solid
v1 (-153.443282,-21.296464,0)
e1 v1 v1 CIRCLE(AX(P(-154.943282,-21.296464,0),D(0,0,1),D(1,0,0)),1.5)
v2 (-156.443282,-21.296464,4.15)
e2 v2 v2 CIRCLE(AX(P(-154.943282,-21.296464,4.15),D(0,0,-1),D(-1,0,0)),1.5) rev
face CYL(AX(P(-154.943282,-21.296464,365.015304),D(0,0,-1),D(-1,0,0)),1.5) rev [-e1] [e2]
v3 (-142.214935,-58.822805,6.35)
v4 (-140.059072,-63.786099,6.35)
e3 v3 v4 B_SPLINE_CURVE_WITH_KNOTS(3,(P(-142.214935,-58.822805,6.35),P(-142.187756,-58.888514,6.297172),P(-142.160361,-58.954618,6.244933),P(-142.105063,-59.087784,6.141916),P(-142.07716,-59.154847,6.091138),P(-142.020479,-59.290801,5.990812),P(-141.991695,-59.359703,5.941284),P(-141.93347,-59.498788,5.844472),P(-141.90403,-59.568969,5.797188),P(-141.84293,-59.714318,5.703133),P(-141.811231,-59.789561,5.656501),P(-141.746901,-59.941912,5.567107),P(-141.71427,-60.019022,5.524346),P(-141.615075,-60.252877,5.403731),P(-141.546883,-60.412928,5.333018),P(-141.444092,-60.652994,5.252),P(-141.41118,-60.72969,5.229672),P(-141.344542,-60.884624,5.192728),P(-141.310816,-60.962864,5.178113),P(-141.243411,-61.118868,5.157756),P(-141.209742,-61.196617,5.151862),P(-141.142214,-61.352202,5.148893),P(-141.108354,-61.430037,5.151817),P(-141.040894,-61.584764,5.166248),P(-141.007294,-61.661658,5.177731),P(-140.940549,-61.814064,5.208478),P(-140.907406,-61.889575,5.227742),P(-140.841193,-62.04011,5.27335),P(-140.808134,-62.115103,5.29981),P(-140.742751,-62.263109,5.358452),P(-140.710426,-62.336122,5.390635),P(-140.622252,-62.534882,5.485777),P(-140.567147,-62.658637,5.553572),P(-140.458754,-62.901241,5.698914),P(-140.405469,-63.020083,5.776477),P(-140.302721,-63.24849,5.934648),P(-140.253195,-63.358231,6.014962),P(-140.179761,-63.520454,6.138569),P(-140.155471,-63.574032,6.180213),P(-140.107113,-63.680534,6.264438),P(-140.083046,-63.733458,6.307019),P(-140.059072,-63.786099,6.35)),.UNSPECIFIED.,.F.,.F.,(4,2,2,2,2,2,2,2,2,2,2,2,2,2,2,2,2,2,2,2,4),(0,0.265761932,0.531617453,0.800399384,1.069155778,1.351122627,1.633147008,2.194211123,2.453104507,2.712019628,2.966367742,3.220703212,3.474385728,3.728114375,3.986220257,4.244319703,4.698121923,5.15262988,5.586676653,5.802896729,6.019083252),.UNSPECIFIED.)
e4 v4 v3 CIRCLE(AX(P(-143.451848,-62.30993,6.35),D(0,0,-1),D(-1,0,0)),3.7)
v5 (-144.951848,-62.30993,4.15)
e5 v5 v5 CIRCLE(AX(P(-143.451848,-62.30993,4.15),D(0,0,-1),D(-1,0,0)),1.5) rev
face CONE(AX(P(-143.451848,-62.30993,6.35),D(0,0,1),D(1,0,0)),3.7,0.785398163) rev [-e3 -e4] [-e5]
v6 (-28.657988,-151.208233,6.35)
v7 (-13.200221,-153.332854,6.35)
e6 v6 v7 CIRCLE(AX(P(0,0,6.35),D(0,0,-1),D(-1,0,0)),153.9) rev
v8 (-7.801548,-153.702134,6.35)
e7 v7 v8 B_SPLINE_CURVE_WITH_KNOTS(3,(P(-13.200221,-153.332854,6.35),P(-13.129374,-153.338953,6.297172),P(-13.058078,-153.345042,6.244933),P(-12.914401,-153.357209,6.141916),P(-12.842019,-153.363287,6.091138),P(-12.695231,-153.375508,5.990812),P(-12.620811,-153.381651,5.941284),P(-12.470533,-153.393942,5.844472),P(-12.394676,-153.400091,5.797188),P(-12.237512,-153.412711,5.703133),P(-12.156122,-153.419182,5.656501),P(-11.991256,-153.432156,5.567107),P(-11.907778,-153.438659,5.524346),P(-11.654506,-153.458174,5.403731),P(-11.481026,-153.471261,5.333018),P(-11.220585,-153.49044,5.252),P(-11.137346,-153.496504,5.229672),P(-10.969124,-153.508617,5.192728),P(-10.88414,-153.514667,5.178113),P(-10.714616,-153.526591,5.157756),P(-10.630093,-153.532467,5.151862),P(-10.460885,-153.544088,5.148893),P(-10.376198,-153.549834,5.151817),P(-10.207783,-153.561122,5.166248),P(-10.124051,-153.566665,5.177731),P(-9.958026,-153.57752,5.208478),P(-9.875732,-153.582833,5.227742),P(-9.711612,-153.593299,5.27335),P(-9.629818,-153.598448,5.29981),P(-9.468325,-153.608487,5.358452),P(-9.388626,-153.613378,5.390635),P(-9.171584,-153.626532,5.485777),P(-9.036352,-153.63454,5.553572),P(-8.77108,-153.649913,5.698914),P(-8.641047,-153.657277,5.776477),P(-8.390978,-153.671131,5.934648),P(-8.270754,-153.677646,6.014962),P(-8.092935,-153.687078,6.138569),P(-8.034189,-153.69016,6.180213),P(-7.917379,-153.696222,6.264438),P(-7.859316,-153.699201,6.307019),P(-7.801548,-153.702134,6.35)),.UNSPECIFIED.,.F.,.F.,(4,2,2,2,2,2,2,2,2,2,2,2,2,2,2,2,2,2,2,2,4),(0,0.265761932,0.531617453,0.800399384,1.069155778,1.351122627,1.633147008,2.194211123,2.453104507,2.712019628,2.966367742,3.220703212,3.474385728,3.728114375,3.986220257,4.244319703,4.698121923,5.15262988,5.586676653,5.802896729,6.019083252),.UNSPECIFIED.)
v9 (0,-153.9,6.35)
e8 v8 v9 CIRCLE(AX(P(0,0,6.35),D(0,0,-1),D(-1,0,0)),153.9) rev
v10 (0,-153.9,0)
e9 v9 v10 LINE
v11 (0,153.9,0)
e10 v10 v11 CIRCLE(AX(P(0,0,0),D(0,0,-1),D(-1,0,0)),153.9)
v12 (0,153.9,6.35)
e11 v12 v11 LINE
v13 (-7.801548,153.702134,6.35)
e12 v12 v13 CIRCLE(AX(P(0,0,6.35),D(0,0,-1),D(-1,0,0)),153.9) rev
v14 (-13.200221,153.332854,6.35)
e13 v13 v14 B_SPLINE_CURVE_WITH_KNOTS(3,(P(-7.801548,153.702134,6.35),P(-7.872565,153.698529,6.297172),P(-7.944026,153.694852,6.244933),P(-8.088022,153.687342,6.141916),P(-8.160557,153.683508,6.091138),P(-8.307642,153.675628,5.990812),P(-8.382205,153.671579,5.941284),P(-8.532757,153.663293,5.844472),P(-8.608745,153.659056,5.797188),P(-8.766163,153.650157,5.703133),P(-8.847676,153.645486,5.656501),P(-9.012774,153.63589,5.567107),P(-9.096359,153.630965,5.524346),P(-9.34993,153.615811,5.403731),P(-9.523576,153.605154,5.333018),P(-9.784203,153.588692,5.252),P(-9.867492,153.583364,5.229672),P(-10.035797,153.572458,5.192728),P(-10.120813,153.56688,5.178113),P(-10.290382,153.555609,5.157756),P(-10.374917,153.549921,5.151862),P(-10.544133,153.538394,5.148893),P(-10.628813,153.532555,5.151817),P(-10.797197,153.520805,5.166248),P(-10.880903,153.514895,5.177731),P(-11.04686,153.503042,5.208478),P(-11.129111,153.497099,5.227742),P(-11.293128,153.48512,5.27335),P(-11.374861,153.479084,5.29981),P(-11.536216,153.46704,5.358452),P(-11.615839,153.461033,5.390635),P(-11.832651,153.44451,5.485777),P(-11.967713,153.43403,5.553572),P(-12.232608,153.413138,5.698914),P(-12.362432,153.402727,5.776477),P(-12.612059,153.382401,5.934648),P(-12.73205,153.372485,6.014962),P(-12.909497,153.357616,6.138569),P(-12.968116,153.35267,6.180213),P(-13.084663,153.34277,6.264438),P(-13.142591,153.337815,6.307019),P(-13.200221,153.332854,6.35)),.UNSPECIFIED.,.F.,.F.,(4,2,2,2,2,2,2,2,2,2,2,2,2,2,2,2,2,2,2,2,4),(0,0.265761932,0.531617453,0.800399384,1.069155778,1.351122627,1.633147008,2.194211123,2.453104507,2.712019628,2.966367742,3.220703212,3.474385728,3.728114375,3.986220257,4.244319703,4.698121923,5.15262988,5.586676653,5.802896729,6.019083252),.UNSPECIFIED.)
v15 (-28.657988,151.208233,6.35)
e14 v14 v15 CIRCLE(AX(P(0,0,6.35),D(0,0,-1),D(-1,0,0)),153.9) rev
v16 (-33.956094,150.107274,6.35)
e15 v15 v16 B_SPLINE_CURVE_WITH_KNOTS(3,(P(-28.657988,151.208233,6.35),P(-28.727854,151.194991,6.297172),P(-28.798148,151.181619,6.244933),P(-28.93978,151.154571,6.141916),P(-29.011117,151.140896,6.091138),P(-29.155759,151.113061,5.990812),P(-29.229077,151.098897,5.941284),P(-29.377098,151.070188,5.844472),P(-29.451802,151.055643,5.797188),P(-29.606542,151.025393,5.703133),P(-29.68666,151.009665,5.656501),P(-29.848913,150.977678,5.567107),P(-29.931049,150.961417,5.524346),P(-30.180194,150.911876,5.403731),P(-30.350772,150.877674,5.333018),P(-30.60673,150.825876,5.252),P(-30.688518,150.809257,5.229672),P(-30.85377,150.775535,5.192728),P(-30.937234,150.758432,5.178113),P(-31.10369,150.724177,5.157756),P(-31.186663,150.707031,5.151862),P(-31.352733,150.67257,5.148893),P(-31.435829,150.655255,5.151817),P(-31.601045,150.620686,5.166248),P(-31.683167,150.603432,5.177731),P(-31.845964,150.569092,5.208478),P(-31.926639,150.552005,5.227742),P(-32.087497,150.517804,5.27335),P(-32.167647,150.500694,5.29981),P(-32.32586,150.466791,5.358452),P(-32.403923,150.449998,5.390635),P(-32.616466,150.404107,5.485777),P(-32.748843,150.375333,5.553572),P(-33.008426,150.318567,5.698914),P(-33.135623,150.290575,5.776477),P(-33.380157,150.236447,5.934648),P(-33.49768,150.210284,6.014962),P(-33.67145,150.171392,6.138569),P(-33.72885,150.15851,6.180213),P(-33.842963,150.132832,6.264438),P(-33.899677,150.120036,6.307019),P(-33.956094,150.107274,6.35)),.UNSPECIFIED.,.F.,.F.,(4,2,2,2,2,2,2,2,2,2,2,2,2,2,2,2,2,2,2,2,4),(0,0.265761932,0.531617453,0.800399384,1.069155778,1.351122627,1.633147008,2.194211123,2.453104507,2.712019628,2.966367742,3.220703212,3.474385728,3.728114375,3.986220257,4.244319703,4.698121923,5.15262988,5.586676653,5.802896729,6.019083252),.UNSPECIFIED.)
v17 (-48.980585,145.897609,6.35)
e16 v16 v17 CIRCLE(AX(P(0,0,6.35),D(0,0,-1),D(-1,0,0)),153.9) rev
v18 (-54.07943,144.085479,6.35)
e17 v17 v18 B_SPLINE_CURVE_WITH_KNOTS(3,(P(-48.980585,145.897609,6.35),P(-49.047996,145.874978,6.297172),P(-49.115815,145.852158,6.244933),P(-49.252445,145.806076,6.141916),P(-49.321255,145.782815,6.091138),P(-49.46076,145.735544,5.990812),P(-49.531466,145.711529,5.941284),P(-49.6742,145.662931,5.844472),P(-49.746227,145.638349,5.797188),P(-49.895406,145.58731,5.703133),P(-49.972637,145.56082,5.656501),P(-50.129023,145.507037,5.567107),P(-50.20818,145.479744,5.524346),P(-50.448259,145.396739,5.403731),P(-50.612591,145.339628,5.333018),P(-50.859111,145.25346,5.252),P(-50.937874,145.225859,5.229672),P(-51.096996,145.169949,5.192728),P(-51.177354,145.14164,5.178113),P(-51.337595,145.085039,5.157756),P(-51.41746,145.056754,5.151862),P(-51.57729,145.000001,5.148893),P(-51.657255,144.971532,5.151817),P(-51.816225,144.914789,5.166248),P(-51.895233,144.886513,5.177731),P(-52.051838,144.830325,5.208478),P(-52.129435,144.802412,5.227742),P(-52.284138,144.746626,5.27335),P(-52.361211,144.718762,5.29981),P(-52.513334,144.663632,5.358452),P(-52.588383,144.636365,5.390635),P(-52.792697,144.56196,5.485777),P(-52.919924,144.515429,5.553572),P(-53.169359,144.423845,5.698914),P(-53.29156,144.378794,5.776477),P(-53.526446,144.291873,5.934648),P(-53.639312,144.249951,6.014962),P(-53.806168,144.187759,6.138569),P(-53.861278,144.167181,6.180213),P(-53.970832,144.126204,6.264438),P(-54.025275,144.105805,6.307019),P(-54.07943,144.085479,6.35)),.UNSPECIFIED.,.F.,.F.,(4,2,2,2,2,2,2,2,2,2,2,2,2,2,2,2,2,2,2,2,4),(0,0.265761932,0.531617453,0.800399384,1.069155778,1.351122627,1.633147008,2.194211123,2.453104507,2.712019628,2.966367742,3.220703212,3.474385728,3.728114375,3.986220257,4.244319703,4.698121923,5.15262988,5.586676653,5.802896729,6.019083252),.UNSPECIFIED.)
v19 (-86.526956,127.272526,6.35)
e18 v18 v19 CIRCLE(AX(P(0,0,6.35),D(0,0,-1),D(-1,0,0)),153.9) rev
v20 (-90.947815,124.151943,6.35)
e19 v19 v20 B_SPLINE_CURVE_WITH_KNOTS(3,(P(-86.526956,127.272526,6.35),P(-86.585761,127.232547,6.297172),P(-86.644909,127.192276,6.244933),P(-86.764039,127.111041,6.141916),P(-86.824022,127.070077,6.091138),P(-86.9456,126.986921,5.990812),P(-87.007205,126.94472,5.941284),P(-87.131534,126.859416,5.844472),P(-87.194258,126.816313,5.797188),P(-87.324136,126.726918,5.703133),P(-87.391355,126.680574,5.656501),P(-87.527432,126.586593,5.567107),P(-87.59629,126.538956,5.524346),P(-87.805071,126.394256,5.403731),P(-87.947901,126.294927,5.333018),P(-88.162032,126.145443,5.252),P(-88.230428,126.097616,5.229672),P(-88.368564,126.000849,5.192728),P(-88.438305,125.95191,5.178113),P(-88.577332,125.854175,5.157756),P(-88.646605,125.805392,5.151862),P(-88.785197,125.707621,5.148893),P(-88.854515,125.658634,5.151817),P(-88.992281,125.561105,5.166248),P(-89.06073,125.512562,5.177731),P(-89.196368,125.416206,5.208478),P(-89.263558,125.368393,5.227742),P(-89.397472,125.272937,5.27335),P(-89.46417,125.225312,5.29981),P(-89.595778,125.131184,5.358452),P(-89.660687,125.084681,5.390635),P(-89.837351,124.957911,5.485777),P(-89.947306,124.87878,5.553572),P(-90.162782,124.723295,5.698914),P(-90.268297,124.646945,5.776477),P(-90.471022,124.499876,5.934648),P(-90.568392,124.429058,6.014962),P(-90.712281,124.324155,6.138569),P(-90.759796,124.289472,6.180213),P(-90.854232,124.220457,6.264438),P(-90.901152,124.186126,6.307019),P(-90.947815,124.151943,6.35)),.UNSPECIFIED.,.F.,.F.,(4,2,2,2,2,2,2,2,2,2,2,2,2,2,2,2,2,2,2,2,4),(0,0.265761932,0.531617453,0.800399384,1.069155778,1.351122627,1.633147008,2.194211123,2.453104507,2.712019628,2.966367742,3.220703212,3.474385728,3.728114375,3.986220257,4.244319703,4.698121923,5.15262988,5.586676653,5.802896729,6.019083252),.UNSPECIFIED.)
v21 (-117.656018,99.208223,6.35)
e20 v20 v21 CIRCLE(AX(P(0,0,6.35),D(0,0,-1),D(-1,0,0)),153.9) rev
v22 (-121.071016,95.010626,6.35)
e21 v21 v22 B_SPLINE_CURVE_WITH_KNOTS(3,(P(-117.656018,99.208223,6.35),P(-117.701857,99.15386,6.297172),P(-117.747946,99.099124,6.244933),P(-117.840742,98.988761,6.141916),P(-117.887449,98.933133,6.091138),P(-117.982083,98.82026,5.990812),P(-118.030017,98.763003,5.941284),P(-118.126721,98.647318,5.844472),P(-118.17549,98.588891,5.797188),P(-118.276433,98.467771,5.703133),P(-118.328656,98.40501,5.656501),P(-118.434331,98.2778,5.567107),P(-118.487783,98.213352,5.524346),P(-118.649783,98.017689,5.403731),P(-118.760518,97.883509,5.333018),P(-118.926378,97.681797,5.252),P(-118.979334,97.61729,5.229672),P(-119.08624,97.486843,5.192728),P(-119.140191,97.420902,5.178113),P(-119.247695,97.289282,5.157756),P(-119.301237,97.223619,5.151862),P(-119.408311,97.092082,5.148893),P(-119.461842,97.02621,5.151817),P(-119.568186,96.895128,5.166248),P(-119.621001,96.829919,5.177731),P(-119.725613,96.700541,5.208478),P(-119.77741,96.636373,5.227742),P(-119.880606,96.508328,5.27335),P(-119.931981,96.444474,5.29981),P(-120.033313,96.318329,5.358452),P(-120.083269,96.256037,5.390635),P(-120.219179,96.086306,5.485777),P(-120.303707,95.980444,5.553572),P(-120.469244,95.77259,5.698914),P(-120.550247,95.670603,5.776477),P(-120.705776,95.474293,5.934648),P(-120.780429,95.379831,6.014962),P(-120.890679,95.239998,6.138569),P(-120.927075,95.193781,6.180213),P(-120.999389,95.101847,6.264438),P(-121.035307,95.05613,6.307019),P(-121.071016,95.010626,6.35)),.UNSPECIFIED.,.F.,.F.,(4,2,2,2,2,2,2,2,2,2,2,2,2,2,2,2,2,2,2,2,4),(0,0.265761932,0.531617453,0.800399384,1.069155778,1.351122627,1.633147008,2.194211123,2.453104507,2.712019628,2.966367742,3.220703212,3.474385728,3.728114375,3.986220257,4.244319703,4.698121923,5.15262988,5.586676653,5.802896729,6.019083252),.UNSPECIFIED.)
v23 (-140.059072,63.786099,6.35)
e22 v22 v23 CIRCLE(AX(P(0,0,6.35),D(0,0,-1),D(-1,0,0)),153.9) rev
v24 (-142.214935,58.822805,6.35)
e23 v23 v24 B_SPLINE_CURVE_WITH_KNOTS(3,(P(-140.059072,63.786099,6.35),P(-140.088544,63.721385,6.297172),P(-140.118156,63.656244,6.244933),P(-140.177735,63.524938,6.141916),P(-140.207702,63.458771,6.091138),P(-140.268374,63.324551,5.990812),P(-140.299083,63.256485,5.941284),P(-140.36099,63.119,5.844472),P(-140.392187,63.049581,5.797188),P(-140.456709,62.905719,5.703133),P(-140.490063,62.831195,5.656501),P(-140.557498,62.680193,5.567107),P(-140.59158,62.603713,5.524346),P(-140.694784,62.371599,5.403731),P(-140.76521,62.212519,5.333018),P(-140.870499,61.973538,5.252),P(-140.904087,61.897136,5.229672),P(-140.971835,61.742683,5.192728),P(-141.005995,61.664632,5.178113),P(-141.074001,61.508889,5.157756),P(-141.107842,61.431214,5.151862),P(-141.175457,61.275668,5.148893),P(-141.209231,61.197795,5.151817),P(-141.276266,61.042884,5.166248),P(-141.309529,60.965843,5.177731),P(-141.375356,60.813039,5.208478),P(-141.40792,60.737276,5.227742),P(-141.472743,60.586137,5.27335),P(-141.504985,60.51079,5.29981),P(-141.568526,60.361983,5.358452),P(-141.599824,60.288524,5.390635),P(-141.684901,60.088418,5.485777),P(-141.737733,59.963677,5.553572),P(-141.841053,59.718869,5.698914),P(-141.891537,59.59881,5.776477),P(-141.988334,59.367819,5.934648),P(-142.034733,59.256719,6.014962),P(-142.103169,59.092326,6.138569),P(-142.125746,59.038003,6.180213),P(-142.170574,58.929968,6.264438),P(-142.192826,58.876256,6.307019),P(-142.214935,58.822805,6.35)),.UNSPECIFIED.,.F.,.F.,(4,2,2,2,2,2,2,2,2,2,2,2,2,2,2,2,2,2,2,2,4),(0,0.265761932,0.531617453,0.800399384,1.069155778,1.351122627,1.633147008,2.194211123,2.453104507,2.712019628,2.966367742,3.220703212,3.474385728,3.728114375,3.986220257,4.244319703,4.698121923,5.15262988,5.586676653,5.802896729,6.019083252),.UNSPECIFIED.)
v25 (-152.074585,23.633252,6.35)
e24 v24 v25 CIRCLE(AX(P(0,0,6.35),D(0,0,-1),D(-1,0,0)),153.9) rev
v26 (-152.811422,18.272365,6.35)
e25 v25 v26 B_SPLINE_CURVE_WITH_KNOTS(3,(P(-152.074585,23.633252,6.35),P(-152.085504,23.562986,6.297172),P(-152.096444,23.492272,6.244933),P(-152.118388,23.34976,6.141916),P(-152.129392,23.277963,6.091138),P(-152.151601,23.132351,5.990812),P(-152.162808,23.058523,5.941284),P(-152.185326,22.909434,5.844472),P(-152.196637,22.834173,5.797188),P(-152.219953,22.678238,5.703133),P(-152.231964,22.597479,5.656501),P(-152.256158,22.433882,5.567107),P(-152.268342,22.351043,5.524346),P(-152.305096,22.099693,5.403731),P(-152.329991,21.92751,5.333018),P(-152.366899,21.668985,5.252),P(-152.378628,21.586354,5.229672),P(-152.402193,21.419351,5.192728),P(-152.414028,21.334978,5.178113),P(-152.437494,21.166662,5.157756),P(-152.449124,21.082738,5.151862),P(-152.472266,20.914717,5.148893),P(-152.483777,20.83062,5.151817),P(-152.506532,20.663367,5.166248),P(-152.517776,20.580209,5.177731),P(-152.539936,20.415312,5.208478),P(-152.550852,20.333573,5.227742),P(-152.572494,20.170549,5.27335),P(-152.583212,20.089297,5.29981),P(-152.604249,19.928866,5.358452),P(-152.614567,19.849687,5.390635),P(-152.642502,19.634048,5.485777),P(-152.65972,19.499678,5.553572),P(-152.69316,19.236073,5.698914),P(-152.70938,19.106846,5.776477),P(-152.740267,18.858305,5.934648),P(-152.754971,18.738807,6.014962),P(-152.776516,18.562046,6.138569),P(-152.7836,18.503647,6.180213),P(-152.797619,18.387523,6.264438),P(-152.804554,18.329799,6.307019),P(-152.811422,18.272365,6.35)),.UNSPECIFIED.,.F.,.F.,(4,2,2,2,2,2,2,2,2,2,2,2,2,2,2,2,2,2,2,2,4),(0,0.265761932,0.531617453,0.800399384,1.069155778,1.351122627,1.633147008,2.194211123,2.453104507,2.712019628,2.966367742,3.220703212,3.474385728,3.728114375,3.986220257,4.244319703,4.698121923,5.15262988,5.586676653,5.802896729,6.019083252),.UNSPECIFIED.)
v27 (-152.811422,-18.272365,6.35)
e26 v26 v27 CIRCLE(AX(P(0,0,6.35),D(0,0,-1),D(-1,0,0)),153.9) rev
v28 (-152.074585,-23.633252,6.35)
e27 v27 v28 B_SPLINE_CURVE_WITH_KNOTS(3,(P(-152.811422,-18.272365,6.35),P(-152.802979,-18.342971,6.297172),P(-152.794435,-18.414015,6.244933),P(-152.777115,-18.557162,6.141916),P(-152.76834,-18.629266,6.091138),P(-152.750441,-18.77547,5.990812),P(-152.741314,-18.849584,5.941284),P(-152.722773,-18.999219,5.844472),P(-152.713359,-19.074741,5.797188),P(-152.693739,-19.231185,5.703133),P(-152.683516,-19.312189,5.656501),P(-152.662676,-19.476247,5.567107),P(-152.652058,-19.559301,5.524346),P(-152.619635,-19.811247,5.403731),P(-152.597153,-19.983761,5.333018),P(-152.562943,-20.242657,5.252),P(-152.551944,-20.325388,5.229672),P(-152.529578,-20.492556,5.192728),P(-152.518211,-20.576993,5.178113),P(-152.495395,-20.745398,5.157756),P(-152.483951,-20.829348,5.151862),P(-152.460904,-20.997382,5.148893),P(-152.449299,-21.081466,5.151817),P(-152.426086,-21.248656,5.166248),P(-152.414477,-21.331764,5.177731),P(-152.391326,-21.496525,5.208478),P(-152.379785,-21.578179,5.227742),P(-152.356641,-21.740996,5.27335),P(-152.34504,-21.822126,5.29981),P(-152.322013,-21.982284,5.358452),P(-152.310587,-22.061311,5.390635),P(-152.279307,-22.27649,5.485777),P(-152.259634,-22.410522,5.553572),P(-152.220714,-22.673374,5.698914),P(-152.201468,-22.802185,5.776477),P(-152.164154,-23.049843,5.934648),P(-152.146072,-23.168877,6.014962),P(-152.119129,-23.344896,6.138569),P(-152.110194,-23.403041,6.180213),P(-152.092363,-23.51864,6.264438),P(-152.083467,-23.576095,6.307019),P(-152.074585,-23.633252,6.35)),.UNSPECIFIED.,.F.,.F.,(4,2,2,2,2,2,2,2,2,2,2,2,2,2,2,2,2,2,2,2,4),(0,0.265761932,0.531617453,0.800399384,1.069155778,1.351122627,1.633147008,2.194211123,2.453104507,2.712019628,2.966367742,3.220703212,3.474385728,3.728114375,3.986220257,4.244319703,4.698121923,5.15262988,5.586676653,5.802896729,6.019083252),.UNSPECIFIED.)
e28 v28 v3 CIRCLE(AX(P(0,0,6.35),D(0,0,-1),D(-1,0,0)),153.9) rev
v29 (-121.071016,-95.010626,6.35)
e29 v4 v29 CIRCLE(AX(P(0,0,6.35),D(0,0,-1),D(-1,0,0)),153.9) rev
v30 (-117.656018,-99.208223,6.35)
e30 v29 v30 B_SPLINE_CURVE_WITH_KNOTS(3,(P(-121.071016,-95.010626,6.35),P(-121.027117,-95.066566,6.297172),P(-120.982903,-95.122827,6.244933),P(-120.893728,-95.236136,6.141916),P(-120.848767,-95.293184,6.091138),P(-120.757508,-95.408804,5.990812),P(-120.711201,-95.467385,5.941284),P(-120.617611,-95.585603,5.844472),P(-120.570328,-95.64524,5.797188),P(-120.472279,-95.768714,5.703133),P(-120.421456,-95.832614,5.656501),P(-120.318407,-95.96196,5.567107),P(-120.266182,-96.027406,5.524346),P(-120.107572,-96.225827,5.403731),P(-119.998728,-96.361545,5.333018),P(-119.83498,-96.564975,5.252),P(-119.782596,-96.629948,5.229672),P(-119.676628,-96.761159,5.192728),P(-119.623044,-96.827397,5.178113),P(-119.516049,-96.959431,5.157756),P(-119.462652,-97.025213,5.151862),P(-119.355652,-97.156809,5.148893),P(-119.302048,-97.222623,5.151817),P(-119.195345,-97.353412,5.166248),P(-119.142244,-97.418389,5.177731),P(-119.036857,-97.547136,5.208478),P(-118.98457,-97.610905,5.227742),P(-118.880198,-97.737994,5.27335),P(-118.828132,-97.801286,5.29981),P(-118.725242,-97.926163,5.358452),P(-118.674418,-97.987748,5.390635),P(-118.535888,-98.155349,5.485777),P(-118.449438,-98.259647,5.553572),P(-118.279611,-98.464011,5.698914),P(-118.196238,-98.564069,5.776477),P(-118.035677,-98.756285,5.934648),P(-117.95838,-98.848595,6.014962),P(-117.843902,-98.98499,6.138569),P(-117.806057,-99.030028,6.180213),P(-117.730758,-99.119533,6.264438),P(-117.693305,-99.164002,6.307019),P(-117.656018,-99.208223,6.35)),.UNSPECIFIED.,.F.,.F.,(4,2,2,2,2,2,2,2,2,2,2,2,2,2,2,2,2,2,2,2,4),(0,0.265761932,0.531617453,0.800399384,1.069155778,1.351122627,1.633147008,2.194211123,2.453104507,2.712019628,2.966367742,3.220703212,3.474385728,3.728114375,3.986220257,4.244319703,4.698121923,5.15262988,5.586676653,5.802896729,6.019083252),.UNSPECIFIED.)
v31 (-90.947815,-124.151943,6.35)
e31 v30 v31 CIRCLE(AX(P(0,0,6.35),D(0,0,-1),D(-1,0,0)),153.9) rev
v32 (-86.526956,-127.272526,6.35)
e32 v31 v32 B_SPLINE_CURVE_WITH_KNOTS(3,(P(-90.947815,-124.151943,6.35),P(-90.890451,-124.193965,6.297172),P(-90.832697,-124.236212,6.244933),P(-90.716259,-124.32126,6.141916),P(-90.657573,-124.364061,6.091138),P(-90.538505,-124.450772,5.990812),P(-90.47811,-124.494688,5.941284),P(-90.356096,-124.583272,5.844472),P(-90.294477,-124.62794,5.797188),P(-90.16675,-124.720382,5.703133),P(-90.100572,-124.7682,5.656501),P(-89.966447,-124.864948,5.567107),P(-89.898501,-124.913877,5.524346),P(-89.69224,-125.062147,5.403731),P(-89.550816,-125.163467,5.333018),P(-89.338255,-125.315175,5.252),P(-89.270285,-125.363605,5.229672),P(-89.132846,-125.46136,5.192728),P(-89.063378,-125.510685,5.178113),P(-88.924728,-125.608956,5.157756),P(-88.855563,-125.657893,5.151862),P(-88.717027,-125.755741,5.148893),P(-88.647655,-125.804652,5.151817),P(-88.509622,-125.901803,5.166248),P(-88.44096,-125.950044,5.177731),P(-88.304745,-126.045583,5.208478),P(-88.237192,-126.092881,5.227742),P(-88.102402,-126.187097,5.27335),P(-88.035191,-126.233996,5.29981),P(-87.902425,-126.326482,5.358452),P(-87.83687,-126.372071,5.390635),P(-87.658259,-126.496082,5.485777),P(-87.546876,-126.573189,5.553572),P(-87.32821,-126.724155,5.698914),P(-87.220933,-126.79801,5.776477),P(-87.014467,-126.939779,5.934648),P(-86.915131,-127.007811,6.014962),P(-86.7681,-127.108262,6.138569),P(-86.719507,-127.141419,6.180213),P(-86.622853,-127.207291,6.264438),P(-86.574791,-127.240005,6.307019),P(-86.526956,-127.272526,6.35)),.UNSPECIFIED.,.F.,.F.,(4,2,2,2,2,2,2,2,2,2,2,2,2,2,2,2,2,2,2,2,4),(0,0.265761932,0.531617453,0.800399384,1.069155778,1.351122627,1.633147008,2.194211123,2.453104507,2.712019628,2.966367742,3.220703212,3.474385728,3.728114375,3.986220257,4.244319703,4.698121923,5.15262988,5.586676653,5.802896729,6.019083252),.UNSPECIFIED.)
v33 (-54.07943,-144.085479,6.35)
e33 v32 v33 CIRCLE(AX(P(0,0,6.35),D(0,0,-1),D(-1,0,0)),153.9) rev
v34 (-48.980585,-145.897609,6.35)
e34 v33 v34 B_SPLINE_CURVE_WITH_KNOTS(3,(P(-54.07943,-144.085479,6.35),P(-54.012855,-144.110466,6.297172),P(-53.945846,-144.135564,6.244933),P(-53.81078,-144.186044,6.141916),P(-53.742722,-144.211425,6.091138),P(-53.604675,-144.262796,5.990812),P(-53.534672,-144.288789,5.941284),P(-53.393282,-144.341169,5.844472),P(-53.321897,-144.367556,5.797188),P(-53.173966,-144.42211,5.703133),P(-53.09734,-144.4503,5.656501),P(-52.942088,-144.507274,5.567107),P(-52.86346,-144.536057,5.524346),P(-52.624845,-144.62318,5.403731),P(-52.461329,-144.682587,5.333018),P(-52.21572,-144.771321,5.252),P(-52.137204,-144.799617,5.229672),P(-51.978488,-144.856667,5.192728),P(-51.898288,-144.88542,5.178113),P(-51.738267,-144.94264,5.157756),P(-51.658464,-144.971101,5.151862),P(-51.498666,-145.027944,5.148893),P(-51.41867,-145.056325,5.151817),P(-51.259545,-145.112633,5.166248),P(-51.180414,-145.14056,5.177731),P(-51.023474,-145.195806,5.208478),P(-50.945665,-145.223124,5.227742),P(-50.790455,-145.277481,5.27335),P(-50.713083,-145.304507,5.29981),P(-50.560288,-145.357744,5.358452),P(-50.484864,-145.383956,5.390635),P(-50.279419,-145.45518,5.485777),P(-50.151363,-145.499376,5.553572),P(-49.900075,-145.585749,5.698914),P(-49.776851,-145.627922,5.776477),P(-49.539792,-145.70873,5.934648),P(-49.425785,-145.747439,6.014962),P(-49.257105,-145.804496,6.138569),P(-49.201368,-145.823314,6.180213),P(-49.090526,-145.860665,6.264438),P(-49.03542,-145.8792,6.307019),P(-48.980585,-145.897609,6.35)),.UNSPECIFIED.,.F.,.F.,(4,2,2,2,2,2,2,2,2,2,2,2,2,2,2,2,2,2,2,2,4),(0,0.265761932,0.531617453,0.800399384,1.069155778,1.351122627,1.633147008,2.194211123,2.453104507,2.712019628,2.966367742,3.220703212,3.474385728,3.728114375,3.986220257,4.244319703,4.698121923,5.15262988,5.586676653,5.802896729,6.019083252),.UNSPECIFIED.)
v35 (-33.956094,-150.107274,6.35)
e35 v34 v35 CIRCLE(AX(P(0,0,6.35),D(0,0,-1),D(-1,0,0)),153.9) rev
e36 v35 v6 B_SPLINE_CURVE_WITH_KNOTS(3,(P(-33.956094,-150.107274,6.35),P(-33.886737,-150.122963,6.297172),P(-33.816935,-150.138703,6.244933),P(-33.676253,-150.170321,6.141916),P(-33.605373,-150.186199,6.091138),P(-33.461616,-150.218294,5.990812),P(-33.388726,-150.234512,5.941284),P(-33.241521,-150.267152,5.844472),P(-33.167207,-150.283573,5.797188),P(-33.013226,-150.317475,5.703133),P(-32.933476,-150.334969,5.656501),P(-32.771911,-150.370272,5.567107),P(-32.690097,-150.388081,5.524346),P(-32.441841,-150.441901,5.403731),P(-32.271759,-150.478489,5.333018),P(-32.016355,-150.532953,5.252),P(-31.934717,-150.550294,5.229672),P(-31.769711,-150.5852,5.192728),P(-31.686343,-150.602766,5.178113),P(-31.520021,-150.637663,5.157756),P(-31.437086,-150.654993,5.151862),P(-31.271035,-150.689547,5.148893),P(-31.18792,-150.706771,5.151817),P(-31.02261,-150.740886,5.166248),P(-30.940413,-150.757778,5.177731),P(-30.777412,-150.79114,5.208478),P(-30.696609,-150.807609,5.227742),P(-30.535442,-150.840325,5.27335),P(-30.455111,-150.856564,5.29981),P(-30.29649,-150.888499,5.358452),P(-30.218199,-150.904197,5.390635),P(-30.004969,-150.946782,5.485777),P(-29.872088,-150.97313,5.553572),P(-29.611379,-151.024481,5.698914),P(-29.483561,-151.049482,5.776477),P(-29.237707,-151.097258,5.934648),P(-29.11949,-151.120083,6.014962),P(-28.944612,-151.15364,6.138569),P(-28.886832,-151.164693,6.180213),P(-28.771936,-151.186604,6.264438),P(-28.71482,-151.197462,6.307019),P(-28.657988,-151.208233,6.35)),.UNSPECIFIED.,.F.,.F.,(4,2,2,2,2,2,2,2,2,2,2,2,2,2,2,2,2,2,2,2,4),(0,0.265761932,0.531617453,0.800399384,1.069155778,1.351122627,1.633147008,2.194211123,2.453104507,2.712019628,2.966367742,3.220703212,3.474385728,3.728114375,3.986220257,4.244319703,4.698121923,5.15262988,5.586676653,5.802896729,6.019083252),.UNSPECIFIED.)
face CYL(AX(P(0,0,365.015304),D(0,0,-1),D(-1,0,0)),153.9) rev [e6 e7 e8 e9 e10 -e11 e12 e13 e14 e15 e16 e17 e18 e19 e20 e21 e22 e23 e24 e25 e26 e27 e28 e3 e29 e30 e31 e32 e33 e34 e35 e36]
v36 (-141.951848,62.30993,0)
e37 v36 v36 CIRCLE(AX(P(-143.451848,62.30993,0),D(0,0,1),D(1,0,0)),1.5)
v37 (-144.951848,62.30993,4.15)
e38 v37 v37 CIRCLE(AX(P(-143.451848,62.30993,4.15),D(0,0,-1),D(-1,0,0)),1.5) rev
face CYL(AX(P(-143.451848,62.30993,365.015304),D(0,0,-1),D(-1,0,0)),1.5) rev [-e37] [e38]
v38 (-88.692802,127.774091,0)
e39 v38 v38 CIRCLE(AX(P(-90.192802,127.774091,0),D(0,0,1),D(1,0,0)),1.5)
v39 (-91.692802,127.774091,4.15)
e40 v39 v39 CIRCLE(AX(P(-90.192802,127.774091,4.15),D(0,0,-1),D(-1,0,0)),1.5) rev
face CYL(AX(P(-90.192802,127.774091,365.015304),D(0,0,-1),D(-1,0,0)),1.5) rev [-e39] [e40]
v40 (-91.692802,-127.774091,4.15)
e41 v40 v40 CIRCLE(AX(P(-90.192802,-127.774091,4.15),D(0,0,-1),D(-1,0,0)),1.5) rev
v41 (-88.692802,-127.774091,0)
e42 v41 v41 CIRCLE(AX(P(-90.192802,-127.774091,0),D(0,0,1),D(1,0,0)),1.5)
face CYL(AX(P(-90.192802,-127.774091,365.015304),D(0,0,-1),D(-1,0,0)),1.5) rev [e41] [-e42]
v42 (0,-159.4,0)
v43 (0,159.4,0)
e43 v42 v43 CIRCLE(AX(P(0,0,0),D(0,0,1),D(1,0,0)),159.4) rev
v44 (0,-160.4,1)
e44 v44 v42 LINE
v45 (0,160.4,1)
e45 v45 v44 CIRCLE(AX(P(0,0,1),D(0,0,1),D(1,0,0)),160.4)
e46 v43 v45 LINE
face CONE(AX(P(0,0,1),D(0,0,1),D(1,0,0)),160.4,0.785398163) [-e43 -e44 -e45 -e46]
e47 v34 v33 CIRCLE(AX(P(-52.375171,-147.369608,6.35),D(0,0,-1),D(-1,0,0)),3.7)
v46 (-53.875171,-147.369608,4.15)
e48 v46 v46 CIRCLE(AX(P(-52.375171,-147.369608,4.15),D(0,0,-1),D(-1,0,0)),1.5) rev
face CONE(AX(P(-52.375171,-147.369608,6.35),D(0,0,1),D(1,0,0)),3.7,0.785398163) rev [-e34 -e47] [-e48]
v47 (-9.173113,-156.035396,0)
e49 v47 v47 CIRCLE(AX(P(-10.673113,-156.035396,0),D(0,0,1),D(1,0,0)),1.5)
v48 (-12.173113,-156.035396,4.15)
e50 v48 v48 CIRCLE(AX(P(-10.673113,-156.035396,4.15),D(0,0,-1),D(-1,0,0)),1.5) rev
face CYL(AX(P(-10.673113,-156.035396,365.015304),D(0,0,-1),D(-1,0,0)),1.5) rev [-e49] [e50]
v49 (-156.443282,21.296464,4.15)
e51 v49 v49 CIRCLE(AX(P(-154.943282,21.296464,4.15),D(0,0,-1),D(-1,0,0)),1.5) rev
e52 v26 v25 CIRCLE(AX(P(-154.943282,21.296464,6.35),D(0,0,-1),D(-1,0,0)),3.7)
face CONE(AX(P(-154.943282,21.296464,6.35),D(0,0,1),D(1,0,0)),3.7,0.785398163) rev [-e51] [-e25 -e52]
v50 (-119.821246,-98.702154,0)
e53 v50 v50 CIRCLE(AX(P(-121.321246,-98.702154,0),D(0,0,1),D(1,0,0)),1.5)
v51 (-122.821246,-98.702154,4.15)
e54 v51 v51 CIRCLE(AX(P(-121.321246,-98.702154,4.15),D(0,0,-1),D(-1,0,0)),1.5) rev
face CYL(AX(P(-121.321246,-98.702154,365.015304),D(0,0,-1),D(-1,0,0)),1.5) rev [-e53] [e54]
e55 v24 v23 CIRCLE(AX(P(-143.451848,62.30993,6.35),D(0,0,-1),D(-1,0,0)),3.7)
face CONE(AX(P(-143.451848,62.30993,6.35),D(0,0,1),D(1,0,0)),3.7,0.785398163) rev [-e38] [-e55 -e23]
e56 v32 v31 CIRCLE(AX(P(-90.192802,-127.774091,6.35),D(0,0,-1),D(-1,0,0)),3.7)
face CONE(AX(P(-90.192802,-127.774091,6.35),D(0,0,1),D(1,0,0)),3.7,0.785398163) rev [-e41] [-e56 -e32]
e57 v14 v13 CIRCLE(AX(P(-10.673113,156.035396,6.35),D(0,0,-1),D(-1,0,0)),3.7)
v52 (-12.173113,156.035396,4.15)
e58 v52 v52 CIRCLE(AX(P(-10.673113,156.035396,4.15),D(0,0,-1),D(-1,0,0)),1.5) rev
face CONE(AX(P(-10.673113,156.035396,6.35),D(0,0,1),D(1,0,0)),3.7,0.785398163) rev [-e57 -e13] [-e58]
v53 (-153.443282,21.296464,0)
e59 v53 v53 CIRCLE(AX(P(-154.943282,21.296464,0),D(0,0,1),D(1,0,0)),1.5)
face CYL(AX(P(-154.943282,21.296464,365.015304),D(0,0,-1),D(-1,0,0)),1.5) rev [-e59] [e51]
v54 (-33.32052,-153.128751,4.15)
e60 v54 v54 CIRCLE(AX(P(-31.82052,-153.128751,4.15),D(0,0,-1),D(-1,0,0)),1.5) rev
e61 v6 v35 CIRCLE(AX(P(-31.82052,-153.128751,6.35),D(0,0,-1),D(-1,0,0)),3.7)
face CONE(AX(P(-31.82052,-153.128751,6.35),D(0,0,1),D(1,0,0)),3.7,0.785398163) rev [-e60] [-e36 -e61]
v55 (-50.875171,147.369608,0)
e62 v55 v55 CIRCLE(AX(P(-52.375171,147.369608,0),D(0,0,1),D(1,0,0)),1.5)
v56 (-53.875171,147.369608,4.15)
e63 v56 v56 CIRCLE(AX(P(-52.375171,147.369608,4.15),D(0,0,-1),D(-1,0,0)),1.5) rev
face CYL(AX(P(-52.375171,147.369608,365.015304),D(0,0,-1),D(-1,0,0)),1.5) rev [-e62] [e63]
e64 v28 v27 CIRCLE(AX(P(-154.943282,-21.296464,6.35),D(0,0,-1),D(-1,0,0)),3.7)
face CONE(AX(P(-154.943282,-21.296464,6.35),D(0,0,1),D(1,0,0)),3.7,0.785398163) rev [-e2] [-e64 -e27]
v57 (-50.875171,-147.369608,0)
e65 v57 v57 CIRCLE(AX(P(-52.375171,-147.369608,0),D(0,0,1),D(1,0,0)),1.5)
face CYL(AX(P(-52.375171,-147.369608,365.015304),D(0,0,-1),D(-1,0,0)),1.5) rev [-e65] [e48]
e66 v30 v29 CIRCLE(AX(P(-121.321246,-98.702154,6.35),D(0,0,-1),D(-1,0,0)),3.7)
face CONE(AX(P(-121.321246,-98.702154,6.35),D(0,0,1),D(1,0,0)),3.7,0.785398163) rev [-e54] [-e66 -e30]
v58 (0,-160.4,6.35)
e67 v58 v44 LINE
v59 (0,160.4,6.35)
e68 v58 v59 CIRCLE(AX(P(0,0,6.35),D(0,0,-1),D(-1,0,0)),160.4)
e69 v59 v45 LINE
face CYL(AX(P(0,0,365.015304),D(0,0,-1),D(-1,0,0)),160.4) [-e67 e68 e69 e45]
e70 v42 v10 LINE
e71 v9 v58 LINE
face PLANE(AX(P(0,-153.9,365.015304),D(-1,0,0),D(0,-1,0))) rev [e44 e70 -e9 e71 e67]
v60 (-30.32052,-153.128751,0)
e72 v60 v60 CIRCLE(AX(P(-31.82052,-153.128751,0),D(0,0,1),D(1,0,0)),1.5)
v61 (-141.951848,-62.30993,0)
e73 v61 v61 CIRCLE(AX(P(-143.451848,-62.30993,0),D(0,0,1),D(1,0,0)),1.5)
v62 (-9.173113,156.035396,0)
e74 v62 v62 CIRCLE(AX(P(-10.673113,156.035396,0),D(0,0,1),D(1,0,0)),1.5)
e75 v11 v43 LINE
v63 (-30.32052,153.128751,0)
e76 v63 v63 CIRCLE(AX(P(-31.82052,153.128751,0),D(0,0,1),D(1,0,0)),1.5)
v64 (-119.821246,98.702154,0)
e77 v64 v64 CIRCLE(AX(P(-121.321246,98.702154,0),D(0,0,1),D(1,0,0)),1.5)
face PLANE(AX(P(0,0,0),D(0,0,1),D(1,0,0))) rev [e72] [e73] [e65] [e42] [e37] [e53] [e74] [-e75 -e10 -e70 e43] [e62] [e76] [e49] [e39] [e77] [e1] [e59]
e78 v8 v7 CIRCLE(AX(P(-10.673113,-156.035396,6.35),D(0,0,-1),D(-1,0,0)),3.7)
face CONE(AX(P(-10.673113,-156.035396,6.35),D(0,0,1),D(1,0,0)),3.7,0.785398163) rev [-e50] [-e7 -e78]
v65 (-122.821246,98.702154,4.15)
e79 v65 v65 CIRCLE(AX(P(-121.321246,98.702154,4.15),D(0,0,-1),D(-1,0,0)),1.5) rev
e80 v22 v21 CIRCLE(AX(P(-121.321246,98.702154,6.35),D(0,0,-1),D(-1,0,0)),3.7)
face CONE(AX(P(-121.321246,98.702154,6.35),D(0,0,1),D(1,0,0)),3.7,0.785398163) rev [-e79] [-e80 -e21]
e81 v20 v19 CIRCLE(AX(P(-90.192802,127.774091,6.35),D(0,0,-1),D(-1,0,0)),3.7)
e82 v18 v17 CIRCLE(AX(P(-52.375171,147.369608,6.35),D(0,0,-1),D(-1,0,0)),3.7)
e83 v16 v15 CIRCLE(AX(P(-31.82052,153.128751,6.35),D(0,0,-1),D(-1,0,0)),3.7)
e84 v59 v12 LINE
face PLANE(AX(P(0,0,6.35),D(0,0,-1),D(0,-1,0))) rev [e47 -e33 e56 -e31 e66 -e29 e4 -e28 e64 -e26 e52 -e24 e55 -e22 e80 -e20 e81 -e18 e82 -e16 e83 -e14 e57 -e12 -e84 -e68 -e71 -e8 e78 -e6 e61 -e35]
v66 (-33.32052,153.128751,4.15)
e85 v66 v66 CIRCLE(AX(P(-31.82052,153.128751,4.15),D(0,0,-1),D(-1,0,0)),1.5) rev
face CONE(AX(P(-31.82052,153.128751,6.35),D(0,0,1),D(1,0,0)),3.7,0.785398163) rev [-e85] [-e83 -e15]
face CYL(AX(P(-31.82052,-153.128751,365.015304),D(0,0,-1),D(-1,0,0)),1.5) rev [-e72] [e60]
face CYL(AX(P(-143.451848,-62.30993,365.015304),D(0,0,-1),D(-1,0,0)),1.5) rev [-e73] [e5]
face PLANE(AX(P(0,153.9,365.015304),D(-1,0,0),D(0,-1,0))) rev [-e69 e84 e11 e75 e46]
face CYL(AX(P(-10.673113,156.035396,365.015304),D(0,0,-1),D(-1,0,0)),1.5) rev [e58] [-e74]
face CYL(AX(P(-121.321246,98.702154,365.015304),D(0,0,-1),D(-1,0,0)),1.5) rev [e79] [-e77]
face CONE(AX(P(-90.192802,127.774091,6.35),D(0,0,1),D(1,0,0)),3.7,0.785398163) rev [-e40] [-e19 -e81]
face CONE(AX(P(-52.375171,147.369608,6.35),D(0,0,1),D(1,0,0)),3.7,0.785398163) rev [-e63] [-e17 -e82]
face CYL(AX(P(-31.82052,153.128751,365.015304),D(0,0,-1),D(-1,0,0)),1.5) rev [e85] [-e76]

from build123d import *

# Parameters (mm, degrees)
SKETCH1_R           = 1.5
BOSS_EXTRUDE1_DEPTH = 6.35
CHAMFER2_SIZE       = 1


with BuildPart() as part:
    # Sketch1 → Boss-Extrude1 (new body)
    with BuildSketch(Plane.XY):
        with BuildLine():
            Line((0, -153.9), (0, -160.4))
            ThreePointArc((0, -160.4), (-160.4, 0), (0, 160.4))
            Line((0, 160.4), (0, 153.9))
            ThreePointArc((0, 153.9), (-153.9, 0), (0, -153.9))
        make_face()
        with Locations(Location((-10.67311345, 156.035395501, 0), (0, 0, 180))):
            Circle(SKETCH1_R, mode=Mode.SUBTRACT)
        with Locations(Location((-31.820520441, 153.128751314, 0), (0, 0, 180))):
            Circle(SKETCH1_R, mode=Mode.SUBTRACT)
        with Locations(Location((-52.375171344, 147.369608219, 0), (0, 0, 180))):
            Circle(SKETCH1_R, mode=Mode.SUBTRACT)
        with Locations(Location((-154.94328196, 21.296463919, 0), (0, 0, 180))):
            Circle(SKETCH1_R, mode=Mode.SUBTRACT)
        with Locations(Location((-143.451847555, 62.309930452, 0), (0, 0, 180))):
            Circle(SKETCH1_R, mode=Mode.SUBTRACT)
        with Locations(Location((-121.321245866, 98.702154493, 0), (0, 0, 180))):
            Circle(SKETCH1_R, mode=Mode.SUBTRACT)
        with Locations(Location((-90.192802379, 127.774091267, 0), (0, 0, 180))):
            Circle(SKETCH1_R, mode=Mode.SUBTRACT)
        with Locations(Location((-154.94328196, -21.296463919, 0), (0, 0, 180))):
            Circle(SKETCH1_R, mode=Mode.SUBTRACT)
        with Locations(Location((-143.451847555, -62.309930452, 0), (0, 0, 180))):
            Circle(SKETCH1_R, mode=Mode.SUBTRACT)
        with Locations(Location((-121.321245866, -98.702154493, 0), (0, 0, 180))):
            Circle(SKETCH1_R, mode=Mode.SUBTRACT)
        with Locations(Location((-90.192802379, -127.774091267, 0), (0, 0, 180))):
            Circle(SKETCH1_R, mode=Mode.SUBTRACT)
        with Locations(Location((-52.375171344, -147.369608219, 0), (0, 0, 180))):
            Circle(SKETCH1_R, mode=Mode.SUBTRACT)
        with Locations(Location((-10.67311345, -156.035395501, 0), (0, 0, 180))):
            Circle(SKETCH1_R, mode=Mode.SUBTRACT)
        with Locations(Location((-31.820520441, -153.128751314, 0), (0, 0, 180))):
            Circle(SKETCH1_R, mode=Mode.SUBTRACT)
    extrude(amount=BOSS_EXTRUDE1_DEPTH)

    # Chamfer1: read off the stored shape, not the designer's step
    # Chamfer1: loft between two sections, ruled curve by curve
    chamfer1_from = [
        Edge.make_three_point_arc((-9.508965266, -155.089478484, 4.15), (-11.619030468, -154.871247317, 4.15), (-11.837261635, -156.981312519, 4.15)),
        Edge.make_three_point_arc((-11.837261635, -156.981312519, 4.15), (-9.727196432, -157.199543686, 4.15), (-9.508965266, -155.089478484, 4.15)),
    ]
    chamfer1_to = [
        Edge.make_three_point_arc((-7.801547928, -153.702133524, 6.35), (-13.006375427, -153.16382998, 6.35), (-13.544678972, -158.368657479, 6.35)),
        Edge.make_three_point_arc((-13.544678972, -158.368657479, 6.35), (-8.339851473, -158.906961023, 6.35), (-7.801547928, -153.702133524, 6.35)),
    ]
    chamfer1 = Solid(Shell([*[Face.make_surface_from_curves(chamfer1_from[k], chamfer1_to[k]) for k in range(2)], Face(Wire(chamfer1_from)), Face(Wire(chamfer1_to))]))
    add(chamfer1, mode=Mode.SUBTRACT)

    # Chamfer1 2: loft between two sections, ruled curve by curve
    chamfer1_2_from = [
        Edge.make_three_point_arc((-30.538412845, -152.350162775, 4.15), (-32.59910898, -151.846643717, 4.15), (-33.102628038, -153.907339852, 4.15)),
        Edge.make_three_point_arc((-33.102628038, -153.907339852, 4.15), (-31.041931903, -154.41085891, 4.15), (-30.538412845, -152.350162775, 4.15)),
    ]
    chamfer1_2_to = [
        Edge.make_three_point_arc((-28.657988371, -151.208232919, 6.35), (-33.741038836, -149.966219243, 6.35), (-34.983052512, -155.049269708, 6.35)),
        Edge.make_three_point_arc((-34.983052512, -155.049269708, 6.35), (-29.900002047, -156.291283384, 6.35), (-28.657988371, -151.208232919, 6.35)),
    ]
    chamfer1_2 = Solid(Shell([*[Face.make_surface_from_curves(chamfer1_2_from[k], chamfer1_2_to[k]) for k in range(2)], Face(Wire(chamfer1_2_from)), Face(Wire(chamfer1_2_to))]))
    add(chamfer1_2, mode=Mode.SUBTRACT)

    # Chamfer1 3: loft between two sections, ruled curve by curve
    chamfer1_3_from = [
        Edge.make_three_point_arc((-50.998987574, -146.772851792, 4.15), (-52.971927771, -145.99342445, 4.15), (-53.751355113, -147.966364647, 4.15)),
        Edge.make_three_point_arc((-53.751355113, -147.966364647, 4.15), (-51.778414916, -148.745791988, 4.15), (-50.998987574, -146.772851792, 4.15)),
    ]
    chamfer1_3_to = [
        Edge.make_three_point_arc((-48.980584713, -145.897609032, 6.35), (-53.847170531, -143.975021589, 6.35), (-55.769757974, -148.841607407, 6.35)),
        Edge.make_three_point_arc((-55.769757974, -148.841607407, 6.35), (-50.903172156, -150.76419485, 6.35), (-48.980584713, -145.897609032, 6.35)),
    ]
    chamfer1_3 = Solid(Shell([*[Face.make_surface_from_curves(chamfer1_3_from[k], chamfer1_3_to[k]) for k in range(2)], Face(Wire(chamfer1_3_from)), Face(Wire(chamfer1_3_to))]))
    add(chamfer1_3, mode=Mode.SUBTRACT)

    # Chamfer1 4: loft between two sections, ruled curve by curve
    chamfer1_4_from = [
        Edge.make_three_point_arc((-88.70664828, -127.570754124, 4.15), (-90.396139522, -126.287937168, 4.15), (-91.678956478, -127.97742841, 4.15)),
        Edge.make_three_point_arc((-91.678956478, -127.97742841, 4.15), (-89.989465236, -129.260245366, 4.15), (-88.70664828, -127.570754124, 4.15)),
    ]
    chamfer1_4_to = [
        Edge.make_three_point_arc((-86.526955601, -127.272526314, 6.35), (-90.694367331, -124.108244489, 6.35), (-93.858649157, -128.275656219, 6.35)),
        Edge.make_three_point_arc((-93.858649157, -128.275656219, 6.35), (-89.691237426, -131.439938045, 6.35), (-86.526955601, -127.272526314, 6.35)),
    ]
    chamfer1_4 = Solid(Shell([*[Face.make_surface_from_curves(chamfer1_4_from[k], chamfer1_4_to[k]) for k in range(2)], Face(Wire(chamfer1_4_from)), Face(Wire(chamfer1_4_to))]))
    add(chamfer1_4, mode=Mode.SUBTRACT)

    # Chamfer1 5: loft between two sections, ruled curve by curve
    chamfer1_5_from = [
        Edge.make_three_point_arc((-119.835342688, -98.90731722, 4.15), (-121.116083139, -97.216251314, 4.15), (-122.807149044, -98.496991765, 4.15)),
        Edge.make_three_point_arc((-122.807149044, -98.496991765, 4.15), (-121.526408593, -100.188057671, 4.15), (-119.835342688, -98.90731722, 4.15)),
    ]
    chamfer1_5_to = [
        Edge.make_three_point_arc((-117.656018026, -99.208222553, 6.35), (-120.815177805, -95.036926653, 6.35), (-124.986473706, -98.196086432, 6.35)),
        Edge.make_three_point_arc((-124.986473706, -98.196086432, 6.35), (-121.827313927, -102.367382332, 6.35), (-117.656018026, -99.208222553, 6.35)),
    ]
    chamfer1_5 = Solid(Shell([*[Face.make_surface_from_curves(chamfer1_5_from[k], chamfer1_5_to[k]) for k in range(2)], Face(Wire(chamfer1_5_from)), Face(Wire(chamfer1_5_to))]))
    add(chamfer1_5, mode=Mode.SUBTRACT)

    # Chamfer1 6: loft between two sections, ruled curve by curve
    chamfer1_6_from = [
        Edge.make_three_point_arc((-142.076397939, -62.908377069, 4.15), (-142.853400939, -60.934480836, 4.15), (-144.827297172, -61.711483835, 4.15)),
        Edge.make_three_point_arc((-144.827297172, -61.711483835, 4.15), (-144.050294172, -63.685380068, 4.15), (-142.076397939, -62.908377069, 4.15)),
    ]
    chamfer1_6_to = [
        Edge.make_three_point_arc((-140.059071835, -63.786098773, 6.35), (-141.975679234, -58.917154732, 6.35), (-146.844623276, -60.833762131, 6.35)),
        Edge.make_three_point_arc((-146.844623276, -60.833762131, 6.35), (-144.928015876, -65.702706172, 6.35), (-140.059071835, -63.786098773, 6.35)),
    ]
    chamfer1_6 = Solid(Shell([*[Face.make_surface_from_curves(chamfer1_6_from[k], chamfer1_6_to[k]) for k in range(2)], Face(Wire(chamfer1_6_from)), Face(Wire(chamfer1_6_to))]))
    add(chamfer1_6, mode=Mode.SUBTRACT)

    # Chamfer1 7: loft between two sections, ruled curve by curve
    chamfer1_7_from = [
        Edge.make_three_point_arc((-153.780296712, -22.243810377, 4.15), (-153.995935502, -20.13347867, 4.15), (-156.106267209, -20.349117461, 4.15)),
        Edge.make_three_point_arc((-156.106267209, -20.349117461, 4.15), (-155.890628418, -22.459449167, 4.15), (-153.780296712, -22.243810377, 4.15)),
    ]
    chamfer1_7_to = [
        Edge.make_three_point_arc((-152.074585014, -23.633251849, 6.35), (-152.60649403, -18.427766972, 6.35), (-157.811978907, -18.959675989, 6.35)),
        Edge.make_three_point_arc((-157.811978907, -18.959675989, 6.35), (-157.28006989, -24.165160865, 6.35), (-152.074585014, -23.633251849, 6.35)),
    ]
    chamfer1_7 = Solid(Shell([*[Face.make_surface_from_curves(chamfer1_7_from[k], chamfer1_7_to[k]) for k in range(2)], Face(Wire(chamfer1_7_from)), Face(Wire(chamfer1_7_to))]))
    add(chamfer1_7, mode=Mode.SUBTRACT)

    # Chamfer1 8: loft between two sections, ruled curve by curve
    chamfer1_8_from = [
        Edge.make_three_point_arc((-153.780296712, 22.243810377, 4.15), (-155.890628418, 22.459449167, 4.15), (-156.106267209, 20.349117461, 4.15)),
        Edge.make_three_point_arc((-156.106267209, 20.349117461, 4.15), (-153.995935502, 20.13347867, 4.15), (-153.780296712, 22.243810377, 4.15)),
    ]
    chamfer1_8_to = [
        Edge.make_three_point_arc((-152.074585014, 23.633251849, 6.35), (-157.28006989, 24.165160865, 6.35), (-157.811978907, 18.959675989, 6.35)),
        Edge.make_three_point_arc((-157.811978907, 18.959675989, 6.35), (-152.60649403, 18.427766972, 6.35), (-152.074585014, 23.633251849, 6.35)),
    ]
    chamfer1_8 = Solid(Shell([*[Face.make_surface_from_curves(chamfer1_8_from[k], chamfer1_8_to[k]) for k in range(2)], Face(Wire(chamfer1_8_from)), Face(Wire(chamfer1_8_to))]))
    add(chamfer1_8, mode=Mode.SUBTRACT)

    # Chamfer1 9: loft between two sections, ruled curve by curve
    chamfer1_9_from = [
        Edge.make_three_point_arc((-142.076397939, 62.908377069, 4.15), (-144.050294172, 63.685380068, 4.15), (-144.827297172, 61.711483835, 4.15)),
        Edge.make_three_point_arc((-144.827297172, 61.711483835, 4.15), (-142.853400939, 60.934480836, 4.15), (-142.076397939, 62.908377069, 4.15)),
    ]
    chamfer1_9_to = [
        Edge.make_three_point_arc((-140.059071835, 63.786098773, 6.35), (-144.928015876, 65.702706172, 6.35), (-146.844623276, 60.833762131, 6.35)),
        Edge.make_three_point_arc((-146.844623276, 60.833762131, 6.35), (-141.975679234, 58.917154732, 6.35), (-140.059071835, 63.786098773, 6.35)),
    ]
    chamfer1_9 = Solid(Shell([*[Face.make_surface_from_curves(chamfer1_9_from[k], chamfer1_9_to[k]) for k in range(2)], Face(Wire(chamfer1_9_from)), Face(Wire(chamfer1_9_to))]))
    add(chamfer1_9, mode=Mode.SUBTRACT)

    # Chamfer1 10: loft between two sections, ruled curve by curve
    chamfer1_10_from = [
        Edge.make_three_point_arc((-119.835342688, 98.90731722, 4.15), (-121.526408593, 100.188057671, 4.15), (-122.807149044, 98.496991765, 4.15)),
        Edge.make_three_point_arc((-122.807149044, 98.496991765, 4.15), (-121.116083139, 97.216251314, 4.15), (-119.835342688, 98.90731722, 4.15)),
    ]
    chamfer1_10_to = [
        Edge.make_three_point_arc((-117.656018026, 99.208222553, 6.35), (-121.827313927, 102.367382332, 6.35), (-124.986473706, 98.196086432, 6.35)),
        Edge.make_three_point_arc((-124.986473706, 98.196086432, 6.35), (-120.815177805, 95.036926653, 6.35), (-117.656018026, 99.208222553, 6.35)),
    ]
    chamfer1_10 = Solid(Shell([*[Face.make_surface_from_curves(chamfer1_10_from[k], chamfer1_10_to[k]) for k in range(2)], Face(Wire(chamfer1_10_from)), Face(Wire(chamfer1_10_to))]))
    add(chamfer1_10, mode=Mode.SUBTRACT)

    # Chamfer1 11: loft between two sections, ruled curve by curve
    chamfer1_11_from = [
        Edge.make_three_point_arc((-88.70664828, 127.570754124, 4.15), (-89.989465236, 129.260245366, 4.15), (-91.678956478, 127.97742841, 4.15)),
        Edge.make_three_point_arc((-91.678956478, 127.97742841, 4.15), (-90.396139522, 126.287937168, 4.15), (-88.70664828, 127.570754124, 4.15)),
    ]
    chamfer1_11_to = [
        Edge.make_three_point_arc((-86.526955601, 127.272526314, 6.35), (-89.691237426, 131.439938045, 6.35), (-93.858649157, 128.275656219, 6.35)),
        Edge.make_three_point_arc((-93.858649157, 128.275656219, 6.35), (-90.694367331, 124.108244489, 6.35), (-86.526955601, 127.272526314, 6.35)),
    ]
    chamfer1_11 = Solid(Shell([*[Face.make_surface_from_curves(chamfer1_11_from[k], chamfer1_11_to[k]) for k in range(2)], Face(Wire(chamfer1_11_from)), Face(Wire(chamfer1_11_to))]))
    add(chamfer1_11, mode=Mode.SUBTRACT)

    # Chamfer1 12: loft between two sections, ruled curve by curve
    chamfer1_12_from = [
        Edge.make_three_point_arc((-50.998987574, 146.772851792, 4.15), (-51.778414916, 148.745791988, 4.15), (-53.751355113, 147.966364647, 4.15)),
        Edge.make_three_point_arc((-53.751355113, 147.966364647, 4.15), (-52.971927771, 145.99342445, 4.15), (-50.998987574, 146.772851792, 4.15)),
    ]
    chamfer1_12_to = [
        Edge.make_three_point_arc((-48.980584713, 145.897609032, 6.35), (-50.903172156, 150.76419485, 6.35), (-55.769757974, 148.841607407, 6.35)),
        Edge.make_three_point_arc((-55.769757974, 148.841607407, 6.35), (-53.847170531, 143.975021589, 6.35), (-48.980584713, 145.897609032, 6.35)),
    ]
    chamfer1_12 = Solid(Shell([*[Face.make_surface_from_curves(chamfer1_12_from[k], chamfer1_12_to[k]) for k in range(2)], Face(Wire(chamfer1_12_from)), Face(Wire(chamfer1_12_to))]))
    add(chamfer1_12, mode=Mode.SUBTRACT)

    # Chamfer1 13: loft between two sections, ruled curve by curve
    chamfer1_13_from = [
        Edge.make_three_point_arc((-30.538412845, 152.350162775, 4.15), (-31.041931903, 154.41085891, 4.15), (-33.102628038, 153.907339852, 4.15)),
        Edge.make_three_point_arc((-33.102628038, 153.907339852, 4.15), (-32.59910898, 151.846643717, 4.15), (-30.538412845, 152.350162775, 4.15)),
    ]
    chamfer1_13_to = [
        Edge.make_three_point_arc((-28.657988371, 151.208232919, 6.35), (-29.900002047, 156.291283384, 6.35), (-34.983052512, 155.049269708, 6.35)),
        Edge.make_three_point_arc((-34.983052512, 155.049269708, 6.35), (-33.741038836, 149.966219243, 6.35), (-28.657988371, 151.208232919, 6.35)),
    ]
    chamfer1_13 = Solid(Shell([*[Face.make_surface_from_curves(chamfer1_13_from[k], chamfer1_13_to[k]) for k in range(2)], Face(Wire(chamfer1_13_from)), Face(Wire(chamfer1_13_to))]))
    add(chamfer1_13, mode=Mode.SUBTRACT)

    # Chamfer1 14: loft between two sections, ruled curve by curve
    chamfer1_14_from = [
        Edge.make_three_point_arc((-9.508965266, 155.089478484, 4.15), (-9.727196432, 157.199543686, 4.15), (-11.837261635, 156.981312519, 4.15)),
        Edge.make_three_point_arc((-11.837261635, 156.981312519, 4.15), (-11.619030468, 154.871247317, 4.15), (-9.508965266, 155.089478484, 4.15)),
    ]
    chamfer1_14_to = [
        Edge.make_three_point_arc((-7.801547928, 153.702133524, 6.35), (-8.339851473, 158.906961023, 6.35), (-13.544678972, 158.368657479, 6.35)),
        Edge.make_three_point_arc((-13.544678972, 158.368657479, 6.35), (-13.006375427, 153.16382998, 6.35), (-7.801547928, 153.702133524, 6.35)),
    ]
    chamfer1_14 = Solid(Shell([*[Face.make_surface_from_curves(chamfer1_14_from[k], chamfer1_14_to[k]) for k in range(2)], Face(Wire(chamfer1_14_from)), Face(Wire(chamfer1_14_to))]))
    add(chamfer1_14, mode=Mode.SUBTRACT)

    # Chamfer2
    chamfer2_edges = [part.edges().sort_by_distance(p)[0] for p in [
        (-160.4, 0, 0),
    ]]
    chamfer(chamfer2_edges, length=CHAMFER2_SIZE)


solid = part.part
